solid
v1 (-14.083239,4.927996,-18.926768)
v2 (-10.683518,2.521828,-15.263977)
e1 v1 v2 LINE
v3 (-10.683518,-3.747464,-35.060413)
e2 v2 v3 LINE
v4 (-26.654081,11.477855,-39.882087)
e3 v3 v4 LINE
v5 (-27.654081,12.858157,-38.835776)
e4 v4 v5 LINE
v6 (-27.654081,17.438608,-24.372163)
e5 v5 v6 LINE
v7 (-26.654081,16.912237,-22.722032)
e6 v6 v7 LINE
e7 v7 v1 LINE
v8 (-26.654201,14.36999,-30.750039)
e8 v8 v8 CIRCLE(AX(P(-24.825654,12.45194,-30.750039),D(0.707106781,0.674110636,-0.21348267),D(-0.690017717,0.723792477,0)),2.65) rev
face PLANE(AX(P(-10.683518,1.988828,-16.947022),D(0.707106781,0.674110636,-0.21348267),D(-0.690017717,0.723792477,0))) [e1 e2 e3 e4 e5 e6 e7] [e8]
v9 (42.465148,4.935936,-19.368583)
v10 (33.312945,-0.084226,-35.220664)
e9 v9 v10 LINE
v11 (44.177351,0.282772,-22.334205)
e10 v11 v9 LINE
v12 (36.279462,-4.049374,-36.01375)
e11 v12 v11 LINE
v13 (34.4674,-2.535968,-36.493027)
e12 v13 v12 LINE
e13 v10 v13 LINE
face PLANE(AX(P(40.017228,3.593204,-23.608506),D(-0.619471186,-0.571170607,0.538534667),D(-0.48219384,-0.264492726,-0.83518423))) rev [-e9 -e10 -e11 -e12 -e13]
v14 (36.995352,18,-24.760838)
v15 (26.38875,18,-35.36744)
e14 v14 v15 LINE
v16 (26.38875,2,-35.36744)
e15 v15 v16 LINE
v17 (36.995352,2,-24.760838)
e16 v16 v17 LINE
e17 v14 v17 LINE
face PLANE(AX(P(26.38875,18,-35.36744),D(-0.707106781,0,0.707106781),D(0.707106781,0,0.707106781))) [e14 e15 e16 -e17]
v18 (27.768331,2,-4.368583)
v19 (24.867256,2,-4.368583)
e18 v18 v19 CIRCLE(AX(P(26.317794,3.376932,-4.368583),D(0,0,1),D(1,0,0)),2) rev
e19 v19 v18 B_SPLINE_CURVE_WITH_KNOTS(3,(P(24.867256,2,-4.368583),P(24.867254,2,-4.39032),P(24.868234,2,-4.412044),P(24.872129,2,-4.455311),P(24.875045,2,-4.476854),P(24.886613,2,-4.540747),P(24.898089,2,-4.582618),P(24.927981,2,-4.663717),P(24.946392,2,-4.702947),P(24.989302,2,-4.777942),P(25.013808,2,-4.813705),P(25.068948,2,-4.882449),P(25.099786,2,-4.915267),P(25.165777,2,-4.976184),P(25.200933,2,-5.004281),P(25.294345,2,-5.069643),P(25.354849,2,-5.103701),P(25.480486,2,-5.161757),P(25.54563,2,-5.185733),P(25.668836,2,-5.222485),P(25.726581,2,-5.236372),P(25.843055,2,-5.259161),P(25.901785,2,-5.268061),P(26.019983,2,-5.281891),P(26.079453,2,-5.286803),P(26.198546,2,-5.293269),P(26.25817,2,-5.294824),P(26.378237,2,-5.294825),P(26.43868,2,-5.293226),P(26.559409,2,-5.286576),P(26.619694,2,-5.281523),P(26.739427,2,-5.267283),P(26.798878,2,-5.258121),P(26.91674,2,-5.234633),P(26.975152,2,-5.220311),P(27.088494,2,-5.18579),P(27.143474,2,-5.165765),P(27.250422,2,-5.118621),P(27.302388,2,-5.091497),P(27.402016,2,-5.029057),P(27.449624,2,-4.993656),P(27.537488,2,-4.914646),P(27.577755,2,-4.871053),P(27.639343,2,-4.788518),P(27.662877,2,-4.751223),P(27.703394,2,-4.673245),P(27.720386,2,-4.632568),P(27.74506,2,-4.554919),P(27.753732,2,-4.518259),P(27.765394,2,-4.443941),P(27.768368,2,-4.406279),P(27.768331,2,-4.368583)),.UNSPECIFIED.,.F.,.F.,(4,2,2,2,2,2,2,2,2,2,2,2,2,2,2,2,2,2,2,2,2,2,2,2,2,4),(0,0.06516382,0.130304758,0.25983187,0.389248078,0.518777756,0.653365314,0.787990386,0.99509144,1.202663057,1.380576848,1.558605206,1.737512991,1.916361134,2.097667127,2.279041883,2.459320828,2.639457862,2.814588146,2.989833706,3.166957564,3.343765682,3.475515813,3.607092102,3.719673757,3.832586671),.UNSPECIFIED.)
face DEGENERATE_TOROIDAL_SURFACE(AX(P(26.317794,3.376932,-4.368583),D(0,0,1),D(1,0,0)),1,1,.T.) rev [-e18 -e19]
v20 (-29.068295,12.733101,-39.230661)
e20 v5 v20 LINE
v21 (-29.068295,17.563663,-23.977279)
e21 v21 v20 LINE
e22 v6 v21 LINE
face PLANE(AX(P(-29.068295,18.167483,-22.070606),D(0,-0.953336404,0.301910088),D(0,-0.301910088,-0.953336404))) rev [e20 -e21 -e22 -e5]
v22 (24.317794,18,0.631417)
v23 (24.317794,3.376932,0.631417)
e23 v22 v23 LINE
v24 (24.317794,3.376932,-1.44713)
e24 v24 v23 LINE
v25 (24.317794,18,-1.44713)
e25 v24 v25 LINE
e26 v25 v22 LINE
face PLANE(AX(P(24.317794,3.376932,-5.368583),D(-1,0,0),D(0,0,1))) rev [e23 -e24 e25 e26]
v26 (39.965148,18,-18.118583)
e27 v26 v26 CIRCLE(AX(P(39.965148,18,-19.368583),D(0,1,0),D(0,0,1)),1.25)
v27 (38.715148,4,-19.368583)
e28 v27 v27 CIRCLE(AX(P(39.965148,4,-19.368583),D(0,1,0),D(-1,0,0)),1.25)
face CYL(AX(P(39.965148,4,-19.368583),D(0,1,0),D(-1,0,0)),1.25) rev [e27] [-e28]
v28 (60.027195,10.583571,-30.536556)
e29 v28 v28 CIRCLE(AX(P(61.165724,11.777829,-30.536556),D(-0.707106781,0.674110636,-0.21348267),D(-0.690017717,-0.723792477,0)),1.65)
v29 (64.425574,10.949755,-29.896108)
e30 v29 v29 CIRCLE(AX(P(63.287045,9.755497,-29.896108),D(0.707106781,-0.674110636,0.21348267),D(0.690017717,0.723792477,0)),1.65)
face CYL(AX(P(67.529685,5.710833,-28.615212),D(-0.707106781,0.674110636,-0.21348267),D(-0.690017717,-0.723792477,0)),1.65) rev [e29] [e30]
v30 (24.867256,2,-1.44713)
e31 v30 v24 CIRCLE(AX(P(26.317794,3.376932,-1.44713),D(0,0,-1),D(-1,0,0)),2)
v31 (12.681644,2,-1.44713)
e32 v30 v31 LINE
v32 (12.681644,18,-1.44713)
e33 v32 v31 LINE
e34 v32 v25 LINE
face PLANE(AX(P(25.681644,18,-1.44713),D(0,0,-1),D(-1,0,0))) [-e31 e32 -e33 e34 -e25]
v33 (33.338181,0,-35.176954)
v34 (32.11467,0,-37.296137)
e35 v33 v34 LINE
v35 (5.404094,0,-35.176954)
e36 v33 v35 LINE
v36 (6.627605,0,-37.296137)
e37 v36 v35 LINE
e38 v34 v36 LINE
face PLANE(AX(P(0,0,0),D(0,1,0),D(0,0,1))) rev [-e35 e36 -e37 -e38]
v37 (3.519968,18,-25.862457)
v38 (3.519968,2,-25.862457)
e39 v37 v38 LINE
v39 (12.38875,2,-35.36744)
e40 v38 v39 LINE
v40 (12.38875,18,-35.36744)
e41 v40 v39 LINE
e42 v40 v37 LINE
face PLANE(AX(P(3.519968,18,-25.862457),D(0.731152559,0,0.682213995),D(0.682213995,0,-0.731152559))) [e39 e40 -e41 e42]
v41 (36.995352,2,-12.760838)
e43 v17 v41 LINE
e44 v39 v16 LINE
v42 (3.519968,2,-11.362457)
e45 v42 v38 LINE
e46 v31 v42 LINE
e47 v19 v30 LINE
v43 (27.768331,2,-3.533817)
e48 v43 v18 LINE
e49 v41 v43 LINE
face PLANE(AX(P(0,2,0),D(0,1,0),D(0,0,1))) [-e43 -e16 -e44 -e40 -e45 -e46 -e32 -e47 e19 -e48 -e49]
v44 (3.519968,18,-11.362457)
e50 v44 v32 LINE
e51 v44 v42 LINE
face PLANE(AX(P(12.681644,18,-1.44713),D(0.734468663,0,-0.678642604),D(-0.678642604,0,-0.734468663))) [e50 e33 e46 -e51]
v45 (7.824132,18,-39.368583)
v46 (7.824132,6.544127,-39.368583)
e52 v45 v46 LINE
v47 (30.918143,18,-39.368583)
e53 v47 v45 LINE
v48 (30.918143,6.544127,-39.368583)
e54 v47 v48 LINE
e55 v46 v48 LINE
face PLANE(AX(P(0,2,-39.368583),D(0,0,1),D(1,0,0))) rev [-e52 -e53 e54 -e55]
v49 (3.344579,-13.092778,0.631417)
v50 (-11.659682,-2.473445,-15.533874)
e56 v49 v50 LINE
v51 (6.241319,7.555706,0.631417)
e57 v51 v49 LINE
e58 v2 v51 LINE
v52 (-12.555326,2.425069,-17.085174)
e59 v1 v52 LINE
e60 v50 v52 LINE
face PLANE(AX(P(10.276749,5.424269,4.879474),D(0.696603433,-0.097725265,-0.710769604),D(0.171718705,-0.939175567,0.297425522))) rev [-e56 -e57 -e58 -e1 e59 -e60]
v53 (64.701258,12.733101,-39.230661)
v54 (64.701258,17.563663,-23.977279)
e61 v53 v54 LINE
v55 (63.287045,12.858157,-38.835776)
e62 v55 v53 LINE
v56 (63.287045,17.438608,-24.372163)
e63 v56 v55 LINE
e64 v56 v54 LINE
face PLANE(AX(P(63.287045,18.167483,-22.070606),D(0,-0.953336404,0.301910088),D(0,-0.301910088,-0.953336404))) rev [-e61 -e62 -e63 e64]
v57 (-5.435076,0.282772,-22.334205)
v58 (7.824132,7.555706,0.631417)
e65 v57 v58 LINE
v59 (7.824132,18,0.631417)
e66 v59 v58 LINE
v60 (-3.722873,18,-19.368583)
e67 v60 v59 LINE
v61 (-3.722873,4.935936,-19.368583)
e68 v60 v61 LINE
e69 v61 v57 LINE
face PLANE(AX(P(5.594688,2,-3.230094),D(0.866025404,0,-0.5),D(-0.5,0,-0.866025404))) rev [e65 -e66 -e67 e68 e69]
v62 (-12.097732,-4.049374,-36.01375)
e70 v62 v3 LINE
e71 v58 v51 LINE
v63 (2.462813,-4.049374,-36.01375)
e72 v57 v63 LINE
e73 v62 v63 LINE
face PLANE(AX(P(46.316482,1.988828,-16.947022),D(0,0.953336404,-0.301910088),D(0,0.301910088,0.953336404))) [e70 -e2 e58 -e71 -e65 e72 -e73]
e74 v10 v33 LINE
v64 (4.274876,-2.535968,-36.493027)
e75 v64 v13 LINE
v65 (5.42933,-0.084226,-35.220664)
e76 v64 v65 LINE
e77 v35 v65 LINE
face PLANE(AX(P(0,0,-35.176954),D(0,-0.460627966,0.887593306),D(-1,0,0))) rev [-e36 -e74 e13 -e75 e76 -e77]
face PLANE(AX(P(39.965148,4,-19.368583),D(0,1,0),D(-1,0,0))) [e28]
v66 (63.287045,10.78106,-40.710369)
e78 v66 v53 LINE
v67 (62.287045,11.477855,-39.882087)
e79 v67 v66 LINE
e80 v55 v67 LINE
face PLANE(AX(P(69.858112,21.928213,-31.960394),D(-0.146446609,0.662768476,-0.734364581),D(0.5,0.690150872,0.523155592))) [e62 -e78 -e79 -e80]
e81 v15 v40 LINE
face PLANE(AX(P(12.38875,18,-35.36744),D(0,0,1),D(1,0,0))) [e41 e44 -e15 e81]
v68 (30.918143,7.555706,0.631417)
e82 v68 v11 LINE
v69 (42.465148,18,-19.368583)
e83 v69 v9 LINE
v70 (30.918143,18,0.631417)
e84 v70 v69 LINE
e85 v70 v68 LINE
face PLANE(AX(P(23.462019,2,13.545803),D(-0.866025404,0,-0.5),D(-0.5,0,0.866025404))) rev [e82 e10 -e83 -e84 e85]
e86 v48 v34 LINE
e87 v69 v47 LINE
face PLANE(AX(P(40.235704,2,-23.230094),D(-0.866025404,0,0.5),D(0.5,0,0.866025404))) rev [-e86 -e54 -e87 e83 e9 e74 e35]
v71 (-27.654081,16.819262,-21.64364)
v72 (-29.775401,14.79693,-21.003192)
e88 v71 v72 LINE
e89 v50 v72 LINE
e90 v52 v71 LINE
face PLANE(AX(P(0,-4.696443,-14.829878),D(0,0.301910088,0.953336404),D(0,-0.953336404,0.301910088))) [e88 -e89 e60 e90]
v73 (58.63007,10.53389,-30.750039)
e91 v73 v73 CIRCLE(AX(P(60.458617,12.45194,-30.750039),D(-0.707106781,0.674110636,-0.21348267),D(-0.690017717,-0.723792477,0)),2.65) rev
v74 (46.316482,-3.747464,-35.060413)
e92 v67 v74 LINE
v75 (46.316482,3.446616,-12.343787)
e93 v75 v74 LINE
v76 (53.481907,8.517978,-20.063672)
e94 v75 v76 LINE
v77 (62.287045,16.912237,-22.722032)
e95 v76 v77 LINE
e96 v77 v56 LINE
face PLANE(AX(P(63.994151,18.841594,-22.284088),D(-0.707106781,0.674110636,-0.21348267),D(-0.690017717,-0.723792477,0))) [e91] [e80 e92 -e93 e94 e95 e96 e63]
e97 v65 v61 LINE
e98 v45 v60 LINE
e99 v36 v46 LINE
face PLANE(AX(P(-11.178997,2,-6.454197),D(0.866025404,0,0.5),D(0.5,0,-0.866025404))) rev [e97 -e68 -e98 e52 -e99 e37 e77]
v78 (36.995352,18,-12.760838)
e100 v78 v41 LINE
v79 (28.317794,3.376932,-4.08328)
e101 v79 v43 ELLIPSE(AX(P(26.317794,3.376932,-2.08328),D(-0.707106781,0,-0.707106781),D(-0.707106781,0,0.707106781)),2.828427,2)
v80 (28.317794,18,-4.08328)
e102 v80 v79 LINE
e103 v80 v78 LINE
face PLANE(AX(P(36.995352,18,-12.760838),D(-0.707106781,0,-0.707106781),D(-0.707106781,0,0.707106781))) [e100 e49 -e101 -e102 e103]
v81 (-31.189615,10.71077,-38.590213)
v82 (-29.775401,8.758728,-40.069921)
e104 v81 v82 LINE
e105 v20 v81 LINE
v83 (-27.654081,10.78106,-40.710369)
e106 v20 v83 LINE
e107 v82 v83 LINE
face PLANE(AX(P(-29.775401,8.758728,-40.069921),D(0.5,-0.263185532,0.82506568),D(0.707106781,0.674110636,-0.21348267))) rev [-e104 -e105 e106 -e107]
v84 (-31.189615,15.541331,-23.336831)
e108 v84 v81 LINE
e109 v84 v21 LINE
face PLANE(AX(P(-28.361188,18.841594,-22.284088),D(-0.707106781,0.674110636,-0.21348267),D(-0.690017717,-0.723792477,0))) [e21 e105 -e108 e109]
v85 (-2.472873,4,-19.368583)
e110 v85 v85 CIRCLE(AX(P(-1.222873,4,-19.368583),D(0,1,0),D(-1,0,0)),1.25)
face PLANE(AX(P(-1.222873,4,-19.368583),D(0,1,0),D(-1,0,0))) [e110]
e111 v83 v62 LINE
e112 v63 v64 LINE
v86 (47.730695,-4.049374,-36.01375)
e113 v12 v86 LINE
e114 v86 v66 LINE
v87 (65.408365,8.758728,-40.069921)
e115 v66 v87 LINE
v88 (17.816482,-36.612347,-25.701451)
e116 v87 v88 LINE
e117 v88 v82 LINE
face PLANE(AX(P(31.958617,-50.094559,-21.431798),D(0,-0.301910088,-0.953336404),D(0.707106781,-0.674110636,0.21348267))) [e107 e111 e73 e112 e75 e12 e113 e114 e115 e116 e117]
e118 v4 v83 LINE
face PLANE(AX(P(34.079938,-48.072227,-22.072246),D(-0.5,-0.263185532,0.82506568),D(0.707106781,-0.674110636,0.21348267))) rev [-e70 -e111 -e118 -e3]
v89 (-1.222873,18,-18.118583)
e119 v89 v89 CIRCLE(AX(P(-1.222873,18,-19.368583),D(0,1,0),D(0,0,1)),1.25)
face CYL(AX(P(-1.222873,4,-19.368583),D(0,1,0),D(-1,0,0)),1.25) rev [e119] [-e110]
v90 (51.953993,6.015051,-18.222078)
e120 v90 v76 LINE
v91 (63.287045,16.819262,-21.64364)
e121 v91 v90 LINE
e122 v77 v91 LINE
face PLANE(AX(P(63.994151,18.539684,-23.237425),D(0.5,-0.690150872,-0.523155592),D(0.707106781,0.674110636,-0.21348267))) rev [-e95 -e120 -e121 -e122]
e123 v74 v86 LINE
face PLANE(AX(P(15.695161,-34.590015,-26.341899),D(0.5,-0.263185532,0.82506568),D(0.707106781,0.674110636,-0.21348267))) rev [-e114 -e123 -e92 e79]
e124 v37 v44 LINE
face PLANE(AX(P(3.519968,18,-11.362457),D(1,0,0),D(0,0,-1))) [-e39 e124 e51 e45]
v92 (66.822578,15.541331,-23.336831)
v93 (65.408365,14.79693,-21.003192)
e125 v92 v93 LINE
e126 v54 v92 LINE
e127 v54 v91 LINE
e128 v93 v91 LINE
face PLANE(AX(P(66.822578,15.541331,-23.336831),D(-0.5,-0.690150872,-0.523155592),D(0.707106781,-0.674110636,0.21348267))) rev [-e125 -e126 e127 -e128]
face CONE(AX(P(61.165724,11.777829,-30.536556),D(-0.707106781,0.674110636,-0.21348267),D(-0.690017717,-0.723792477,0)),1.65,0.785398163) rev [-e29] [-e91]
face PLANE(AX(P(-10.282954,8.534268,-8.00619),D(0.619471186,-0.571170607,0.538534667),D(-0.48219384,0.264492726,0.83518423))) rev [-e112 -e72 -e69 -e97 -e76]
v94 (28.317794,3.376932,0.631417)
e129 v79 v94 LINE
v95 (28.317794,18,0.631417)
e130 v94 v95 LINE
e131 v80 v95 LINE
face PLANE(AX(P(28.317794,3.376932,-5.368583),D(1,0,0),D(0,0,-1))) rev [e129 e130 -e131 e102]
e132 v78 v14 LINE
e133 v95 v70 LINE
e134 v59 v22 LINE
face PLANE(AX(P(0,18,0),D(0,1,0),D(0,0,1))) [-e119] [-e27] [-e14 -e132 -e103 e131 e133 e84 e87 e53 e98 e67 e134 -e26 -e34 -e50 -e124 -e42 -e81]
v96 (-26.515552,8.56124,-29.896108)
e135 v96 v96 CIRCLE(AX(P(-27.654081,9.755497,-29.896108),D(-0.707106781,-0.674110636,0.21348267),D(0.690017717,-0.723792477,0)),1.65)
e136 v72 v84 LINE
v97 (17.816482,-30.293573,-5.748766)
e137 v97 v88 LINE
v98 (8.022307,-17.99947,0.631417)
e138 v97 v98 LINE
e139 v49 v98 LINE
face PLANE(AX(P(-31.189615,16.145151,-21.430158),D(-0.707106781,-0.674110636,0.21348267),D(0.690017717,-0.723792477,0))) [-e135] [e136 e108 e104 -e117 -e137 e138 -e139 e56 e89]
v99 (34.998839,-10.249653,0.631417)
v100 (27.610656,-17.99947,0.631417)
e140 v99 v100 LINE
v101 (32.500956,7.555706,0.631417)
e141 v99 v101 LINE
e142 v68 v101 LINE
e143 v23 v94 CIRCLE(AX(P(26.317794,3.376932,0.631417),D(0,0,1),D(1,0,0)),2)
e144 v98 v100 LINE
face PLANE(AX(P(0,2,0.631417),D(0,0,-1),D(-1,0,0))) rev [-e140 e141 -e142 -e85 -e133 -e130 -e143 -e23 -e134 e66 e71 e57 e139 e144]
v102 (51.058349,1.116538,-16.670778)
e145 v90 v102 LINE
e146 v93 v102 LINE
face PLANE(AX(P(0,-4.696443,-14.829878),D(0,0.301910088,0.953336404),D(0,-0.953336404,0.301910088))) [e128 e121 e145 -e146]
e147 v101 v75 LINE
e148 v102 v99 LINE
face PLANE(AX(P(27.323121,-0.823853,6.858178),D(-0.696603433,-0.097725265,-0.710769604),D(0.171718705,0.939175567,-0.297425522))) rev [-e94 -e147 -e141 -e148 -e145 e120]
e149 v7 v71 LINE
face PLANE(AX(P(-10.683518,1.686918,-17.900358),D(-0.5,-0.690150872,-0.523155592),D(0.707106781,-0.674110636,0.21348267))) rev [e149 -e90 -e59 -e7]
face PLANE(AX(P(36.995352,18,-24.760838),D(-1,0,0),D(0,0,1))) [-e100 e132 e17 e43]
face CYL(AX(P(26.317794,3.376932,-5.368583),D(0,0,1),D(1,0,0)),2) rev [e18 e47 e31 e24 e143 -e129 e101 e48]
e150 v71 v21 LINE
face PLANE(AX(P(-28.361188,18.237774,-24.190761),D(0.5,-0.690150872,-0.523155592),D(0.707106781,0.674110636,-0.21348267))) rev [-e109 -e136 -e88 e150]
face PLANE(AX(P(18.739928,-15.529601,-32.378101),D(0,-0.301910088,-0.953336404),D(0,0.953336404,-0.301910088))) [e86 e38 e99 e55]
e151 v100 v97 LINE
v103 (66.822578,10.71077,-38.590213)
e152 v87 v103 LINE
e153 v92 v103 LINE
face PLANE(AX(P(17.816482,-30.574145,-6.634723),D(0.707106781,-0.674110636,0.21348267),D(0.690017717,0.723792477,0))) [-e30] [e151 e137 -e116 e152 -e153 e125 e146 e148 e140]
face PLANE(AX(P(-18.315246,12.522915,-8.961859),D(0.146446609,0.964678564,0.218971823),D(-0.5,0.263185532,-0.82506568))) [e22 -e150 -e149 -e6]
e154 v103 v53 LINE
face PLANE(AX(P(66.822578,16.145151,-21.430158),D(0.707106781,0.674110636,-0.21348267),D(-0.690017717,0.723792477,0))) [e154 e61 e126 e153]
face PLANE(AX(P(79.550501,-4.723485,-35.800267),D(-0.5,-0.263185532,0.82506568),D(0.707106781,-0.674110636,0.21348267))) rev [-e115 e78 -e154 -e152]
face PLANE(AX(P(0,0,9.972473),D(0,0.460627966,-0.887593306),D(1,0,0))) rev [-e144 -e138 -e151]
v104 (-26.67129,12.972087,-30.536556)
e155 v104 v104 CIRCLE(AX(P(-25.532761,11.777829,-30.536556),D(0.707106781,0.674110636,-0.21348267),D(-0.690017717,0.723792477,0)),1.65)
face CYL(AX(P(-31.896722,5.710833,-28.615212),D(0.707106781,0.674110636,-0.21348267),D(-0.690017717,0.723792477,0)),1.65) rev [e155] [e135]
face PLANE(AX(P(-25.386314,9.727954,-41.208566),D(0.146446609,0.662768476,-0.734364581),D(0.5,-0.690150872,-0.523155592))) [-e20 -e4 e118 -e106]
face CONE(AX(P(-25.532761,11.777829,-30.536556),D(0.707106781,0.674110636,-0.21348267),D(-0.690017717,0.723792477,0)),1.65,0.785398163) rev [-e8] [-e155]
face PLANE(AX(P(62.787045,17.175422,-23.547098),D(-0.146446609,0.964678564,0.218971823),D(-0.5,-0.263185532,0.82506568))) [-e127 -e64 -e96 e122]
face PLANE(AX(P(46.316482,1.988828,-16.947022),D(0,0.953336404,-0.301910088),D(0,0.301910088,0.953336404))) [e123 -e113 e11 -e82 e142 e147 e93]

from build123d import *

# Parameters (mm, degrees)
BOSS_EXTRUDE3_DEPTH   = 1.9999999999999931
BOSS_EXTRUDE4_DEPTH   = 18.000000000000004
CUT_EXTRUDE2_DEPTH    = 5.9999999999999964
FILLET2_R             = 1
BOSS_EXTRUDE5_DEPTH   = 13.9
BOSS_EXTRUDE6_DEPTH   = 6.1
SKETCH9_R             = 76.29483757465395
CUT_EXTRUDE3_DEPTH    = 12.00000000000001
CHAMFER5_SIZE         = 15
CHAMFER5_SIZE_2       = 11.949844195
CHAMFER6_SIZE         = 26.289657229
CHAMFER6_SIZE_2       = 33
CHAMFER7_SIZE         = 10
CHAMFER7_SIZE_2       = 24.849963072
CHAMFER8_SIZE         = 3
CHAMFER8_SIZE2        = 3.581723532320745
CHAMFER8_EDGE_2_SIZE  = 3
CHAMFER8_EDGE_2_SIZE2 = 3.581723532320745
SKETCH10_R            = 1.250000000000001
SKETCH10_R_2          = 1.2500000000000047
CUT_EXTRUDE4_DEPTH    = 15
SKETCH11_R            = 1.6500000000000021
CUT_EXTRUDE5_DEPTH    = 10
SKETCH12_R            = 1.6500000000000021
CUT_EXTRUDE6_DEPTH    = 10
CHAMFER9_SIZE         = 2
CHAMFER10_SIZE        = 1
CHAMFER11_SIZE        = 1


with BuildPart() as part:
    # Sketch4 → Boss-Extrude3 (new body)
    # profile 1 of 2: a face of its own
    with BuildSketch(Plane(origin=(0, 0, 0), x_dir=(1, 0, 0), z_dir=(0, 1, 0))):
        Polygon((7.824132301685717, -0.6314167523101926), (30.918143069270773, -0.631416752310193), (42.46514845306328, 19.368583247689788), (30.918143069270762, 39.3685832476898), (7.824132301685726, 39.3685832476898), (-3.7228730821067892, 19.368583247689806), align=None)
        Polygon((3.519968483082529, 11.362456608232566), (3.519968483082529, 25.862456608232566), (12.388750416506909, 35.367439881093425), (26.38875041650691, 35.367439881093425), (36.99535213430513, 24.760838163295233), (36.99535213430513, 12.760838163295231), (25.681643635320377, 1.447129664310468), (12.681643635320377, 1.4471296643104665), align=None, mode=Mode.SUBTRACT)
    # profile 2 of 2: a face of its own
    with BuildSketch(Plane(origin=(0, 0, 0), x_dir=(1, 0, 0), z_dir=(0, 1, 0))):
        Polygon((3.519968483082529, 25.862456608232566), (12.388750416506909, 35.367439881093425), (26.38875041650691, 35.367439881093425), (36.99535213430513, 24.760838163295233), (36.99535213430513, 12.760838163295231), (25.681643635320377, 1.447129664310468), (12.681643635320377, 1.4471296643104665), (3.519968483082529, 11.362456608232566), align=None)
    extrude(amount=BOSS_EXTRUDE3_DEPTH)

    # Sketch4<3> → Boss-Extrude4 (add)
    with BuildSketch(Plane(origin=(0, 0, 0), x_dir=(1, 0, 0), z_dir=(0, 1, 0))):
        Polygon((42.46514845306328, 19.368583247689788), (30.918143069270762, 39.3685832476898), (7.824132301685726, 39.3685832476898), (-3.7228730821067892, 19.368583247689806), (7.824132301685717, -0.6314167523101926), (30.918143069270773, -0.631416752310193), align=None)
        Polygon((12.388750416506909, 35.367439881093425), (26.38875041650691, 35.367439881093425), (36.99535213430513, 24.760838163295233), (36.99535213430513, 12.760838163295231), (25.681643635320377, 1.447129664310468), (12.681643635320377, 1.4471296643104665), (3.519968483082529, 11.362456608232566), (3.519968483082529, 25.862456608232566), align=None, mode=Mode.SUBTRACT)
    extrude(amount=BOSS_EXTRUDE4_DEPTH)

    # Sketch6 → Cut-Extrude2 (cut)
    with BuildSketch(Plane.XY.offset(0.6314167523101925)):
        with BuildLine():
            Line((24.31779352067575, 3.376931571822402), (24.31779352067575, 18.000000000000004))
            ThreePointArc((24.31779352067575, 18.000000000000004), (26.317793520675753, 20), (28.31779352067575, 18.000000000000004))
            Line((28.31779352067575, 18.000000000000004), (28.31779352067575, 3.376931571822402))
            ThreePointArc((28.31779352067575, 3.376931571822402), (26.317793520675753, 1.3769315718223982), (24.31779352067575, 3.376931571822402))
        make_face()
    extrude(amount=-CUT_EXTRUDE2_DEPTH, mode=Mode.SUBTRACT)

    # Fillet2
    # the kernel refuses this fillet: 1 mm, written as the material it adds along each edge
    with BuildSketch(Plane(origin=(26.31779352067575, 3.3769315718223982, -5.368583247689804), x_dir=(0.8817842513635834, 0.4716529805345926, 0), z_dir=(-0.4716529805345926, 0.8817842513635834, 0))) as fillet2_piece_1_section:
        with BuildLine():
            CenterArc((2.000000000000001 - FILLET2_R, -FILLET2_R), FILLET2_R, 0, 90)
            Line((2.000000000000001 - FILLET2_R, 0), (2.000000000000001, 0))
            Line((2.000000000000001, 0), (2.000000000000001, -FILLET2_R))
        make_face()
    fillet2_piece_1 = revolve(axis=Axis((26.31779352067575, 3.3769315718223982, -5.368583247689804), (0, 0, -1)), revolution_arc=236.283297356719, mode=Mode.PRIVATE)
    fillet2_piece_1 = split(fillet2_piece_1, bisect_by=Plane(origin=(26.31779352067575, 1.9999999999999931, -5.368583247689804), z_dir=(0, -1, 0)), keep=Keep.TOP, mode=Mode.PRIVATE)
    add(fillet2_piece_1)

    # Sketch7 → Boss-Extrude5 (add)
    with BuildSketch(Plane(origin=(-2.3433e-13, -8.892992763494398, -28.081253619485487), x_dir=(-1, 2.4e-15, 7.58e-15), z_dir=(-7.955288143323601e-15, -0.30191008762919974, -0.9533364038930481))):
        Polygon((-17.816481796236683, -27.144355489981812), (-66.82257845064771, 21.861741164426753), (-63.9941513259015, 24.69016828917295), (-46.3164817962378, 7.012498759509267), (10.683518203762196, 7.01249875950926), (28.361187733425872, 24.690168289172963), (31.189614858172064, 21.861741164426775), align=None)
    extrude(amount=-BOSS_EXTRUDE5_DEPTH)

    # Sketch7<2> → Boss-Extrude6 (add)
    with BuildSketch(Plane(origin=(-2.3433e-13, -8.892992763494398, -28.081253619485487), x_dir=(-1, 2.4e-15, 7.58e-15), z_dir=(-7.955288143323601e-15, -0.30191008762919974, -0.9533364038930481))):
        Polygon((-17.816481796236683, -27.144355489981812), (-66.82257845064771, 21.861741164426753), (-63.9941513259015, 24.69016828917295), (-46.3164817962378, 7.012498759509267), (10.683518203762196, 7.01249875950926), (28.361187733425872, 24.690168289172963), (31.189614858172064, 21.861741164426775), align=None)
    extrude(amount=BOSS_EXTRUDE6_DEPTH)

    # Sketch9 → Cut-Extrude3 (cut)
    with BuildSketch(Plane(origin=(-2.4437e-13, -10.73464429803257, -33.896605683233126), x_dir=(-1, 2.08e-15, 6.55e-15), z_dir=(-6.8729633786059295e-15, -0.30191008762920085, -0.9533364038930477))):
        with Locations((-18.739928273786745, -5.029658831402463)):
            Circle(SKETCH9_R)
    extrude(amount=CUT_EXTRUDE3_DEPTH, mode=Mode.SUBTRACT)

    # Chamfer5
    # the kernel refuses this chamfer: 15, 11.949844195 mm, written as the material it adds along each edge
    with BuildSketch(Plane(origin=(-40.07039654949479, -6.7e-16, -23.227109814634193), x_dir=(0, -0.3019100876291997, -0.9533364038930482), z_dir=(1, 0, -4.1e-16))) as chamfer5_piece_1_section:
        Polygon((CHAMFER5_SIZE, -1.7e-16), (CHAMFER5_SIZE_2 * 0.953336403892, CHAMFER5_SIZE_2 * 0.301910087629), (0, 0), align=None)
    chamfer5_piece_1 = extrude(amount=118.88306846994604, mode=Mode.PRIVATE)
    chamfer5_piece_1 = split(chamfer5_piece_1, bisect_by=Plane(origin=(-11.138962934878297, -6.7e-16, -6.523538829193566), z_dir=(0.8660254037844386, 0, 0.5000000000000002)), keep=Keep.TOP, mode=Mode.PRIVATE)
    chamfer5_piece_1 = split(chamfer5_piece_1, bisect_by=Plane(origin=(20.160471188348254, -6.7e-16, -58.0014175166026), z_dir=(-0.8660254037844387, 0, 0.49999999999999983)), keep=Keep.TOP, mode=Mode.PRIVATE)
    chamfer5_piece_1 = split(chamfer5_piece_1, bisect_by=Plane(origin=(-40.070396549494895, -4.049373948337407, -36.01374979821588), z_dir=(7.955288143323603e-15, 0.3019100876291998, 0.9533364038930482)), keep=Keep.TOP, mode=Mode.PRIVATE)
    add(chamfer5_piece_1)

    # Chamfer6
    # the kernel refuses this chamfer: 33, 26.289657229 mm, written as the material it adds along each edge
    with BuildSketch(Plane(origin=(-86.82668553862769, 6e-17, -16.317184053181116), x_dir=(8.34e-15, 0, 1), z_dir=(1, 0, -8.34e-15))) as chamfer6_piece_1_section:
        Polygon((CHAMFER6_SIZE, 0), (CHAMFER6_SIZE_2 * 0.301910087629, CHAMFER6_SIZE_2 * 0.953336403893), (0, 0), align=None)
    chamfer6_piece_1 = extrude(amount=212.3956464482121, mode=Mode.PRIVATE)
    chamfer6_piece_1 = split(chamfer6_piece_1, bisect_by=Plane(origin=(8.820895345374609, 6e-17, 38.90497251753413), z_dir=(-0.8660254037844387, 0, -0.5000000000000001)), keep=Keep.TOP, mode=Mode.PRIVATE)
    chamfer6_piece_1 = split(chamfer6_piece_1, bisect_by=Plane(origin=(-86.82668553862769, 6e-17, 0.6314167523101908), z_dir=(2e-17, 0, -1)), keep=Keep.TOP, mode=Mode.PRIVATE)
    chamfer6_piece_1 = split(chamfer6_piece_1, bisect_by=Plane(origin=(-23.17753158647104, 6e-17, -53.06504022115066), z_dir=(0.8660254037844388, 0, -0.49999999999999967)), keep=Keep.TOP, mode=Mode.PRIVATE)
    chamfer6_piece_1 = split(chamfer6_piece_1, bisect_by=Plane(origin=(-18.469762892528394, -65.16714281663096, 4.320460452965666), z_dir=(-0.70710678118653, 0.6741106359447901, -0.213482670271232)), keep=Keep.TOP, mode=Mode.PRIVATE)
    chamfer6_piece_1 = split(chamfer6_piece_1, bisect_by=Plane(origin=(-50.54044084986548, 34.5929980223678, -27.27236736690021), z_dir=(0.7071067811865465, 0.6741106359447712, -0.21348267027123768)), keep=Keep.TOP, mode=Mode.PRIVATE)
    add(chamfer6_piece_1)

    # Chamfer7
    # the kernel refuses this chamfer: 24.849963072, 10 mm, written as the material it adds along each edge
    with BuildSketch(Plane(origin=(-13.402538260860302, 62.57603192906444, -36.134255137466226), x_dir=(-0.985146022817089, -0.16370569293011733, 0.051843609345241695), z_dir=(0.17171870523525357, -0.9391755667020143, 0.29742552207616374))) as chamfer7_piece_1_section:
        Polygon((CHAMFER7_SIZE, 0), (-CHAMFER7_SIZE_2 * 0.47666820195, -CHAMFER7_SIZE_2 * 0.879083286874), (0, 0), align=None)
    chamfer7_piece_1 = extrude(amount=146.25239464157488, mode=Mode.PRIVATE)
    chamfer7_piece_1 = split(chamfer7_piece_1, bisect_by=Plane(origin=(-13.402538260860302, 62.57603192906444, 0.6314167523100025), z_dir=(0, 0, -1)), keep=Keep.TOP, mode=Mode.PRIVATE)
    chamfer7_piece_1 = split(chamfer7_piece_1, bisect_by=Plane(origin=(-13.402538260860295, 1.9888278042485794, -16.94702172034867), z_dir=(0, -0.9533364038930481, 0.3019100876291998)), keep=Keep.TOP, mode=Mode.PRIVATE)
    chamfer7_piece_1 = split(chamfer7_piece_1, bisect_by=Plane(origin=(-46.64785866937016, 30.88205772455304, -26.09715753968952), z_dir=(0.7071067811866999, 0.674110635944714, -0.21348267027090945)), keep=Keep.TOP, mode=Mode.PRIVATE)
    add(chamfer7_piece_1)
    with BuildSketch(Plane(origin=(-13.402538260860302, 62.57603192906444, -36.134255137466226), x_dir=(-0.985146022817089, -0.16370569293011733, 0.051843609345241695), z_dir=(0.17171870523525357, -0.9391755667020143, 0.29742552207616374))) as chamfer7_piece_2_section:
        Polygon((CHAMFER7_SIZE, 0), (-CHAMFER7_SIZE_2 * 0.47666820195, -CHAMFER7_SIZE_2 * 0.879083286874), (0, 0), align=None)
    chamfer7_piece_2 = extrude(amount=146.25239464157488, mode=Mode.PRIVATE)
    chamfer7_piece_2 = split(chamfer7_piece_2, bisect_by=Plane(origin=(-43.819431544616265, 33.57850026833004, -26.951088220759228), z_dir=(-0.7071067811865481, -0.6741106359447696, 0.2134826702712372)), keep=Keep.TOP, mode=Mode.PRIVATE)
    chamfer7_piece_2 = split(chamfer7_piece_2, bisect_by=Plane(origin=(1.116959507238203, 62.57603192906444, -27.751419192552138), z_dir=(-0.866025403784329, 0, -0.50000000000019)), keep=Keep.TOP, mode=Mode.PRIVATE)
    chamfer7_piece_2 = split(chamfer7_piece_2, bisect_by=Plane(origin=(-46.64785866937016, 30.88205772455304, -26.09715753968952), z_dir=(0.7071067811866999, 0.674110635944714, -0.21348267027090945)), keep=Keep.TOP, mode=Mode.PRIVATE)
    add(chamfer7_piece_2)
    with BuildSketch(Plane(origin=(40.70342230672514, 1.421e-14, -16.317184053181006), x_dir=(-0.46958778335124995, 0.34343741046908505, 0.8133498993775979), z_dir=(-0.17171870523460778, -0.9391755667021419, 0.29742552207613376))) as chamfer7_piece_3_section:
        Polygon((CHAMFER7_SIZE_2, 5e-17), (-CHAMFER7_SIZE * 0.476668201947, -CHAMFER7_SIZE * 0.879083286869), (0, 0), align=None)
    chamfer7_piece_3 = extrude(amount=75.8012281617361, mode=Mode.PRIVATE)
    chamfer7_piece_3 = split(chamfer7_piece_3, bisect_by=Plane(origin=(40.70342230672514, 1.421e-14, 0.6314167523099989), z_dir=(0, 0, -1)), keep=Keep.TOP, mode=Mode.PRIVATE)
    chamfer7_piece_3 = split(chamfer7_piece_3, bisect_by=Plane(origin=(45.29529103013723, -4.37759561592531, -14.930852564516274), z_dir=(-0.7071067811866999, 0.674110635944714, -0.21348267027090945)), keep=Keep.TOP, mode=Mode.PRIVATE)
    add(chamfer7_piece_3)
    with BuildSketch(Plane(origin=(40.703422306709314, 0, -16.317184053182185), x_dir=(-0.4695877833507219, 0.3434374104692333, 0.8133498993778403), z_dir=(0.17171870523461666, 0.9391755667020876, -0.29742552207629974))) as chamfer7_piece_4_section:
        Polygon((CHAMFER7_SIZE_2, -1.39e-15), (-CHAMFER7_SIZE * 0.476668201946, CHAMFER7_SIZE * 0.87908328687), (0, 0), align=None)
    chamfer7_piece_4 = extrude(amount=66.6286838666467, mode=Mode.PRIVATE)
    chamfer7_piece_4 = split(chamfer7_piece_4, bisect_by=Plane(origin=(40.703422306709314, 0, 0.6314167523099989), z_dir=(0, 0, -1)), keep=Keep.TOP, mode=Mode.PRIVATE)
    chamfer7_piece_4 = split(chamfer7_piece_4, bisect_by=Plane(origin=(40.703422306709314, 1.9888278042464063, -16.94702172035553), z_dir=(0, -0.9533364038930481, 0.3019100876291998)), keep=Keep.TOP, mode=Mode.PRIVATE)
    chamfer7_piece_4 = split(chamfer7_piece_4, bisect_by=Plane(origin=(45.29529103012948, -4.377595615933028, -14.930852564515012), z_dir=(-0.7071067811866999, 0.674110635944714, -0.21348267027090945)), keep=Keep.TOP, mode=Mode.PRIVATE)
    add(chamfer7_piece_4)
    with BuildSketch(Plane(origin=(40.703422306709314, 0, -16.317184053182185), x_dir=(-0.4695877833507219, 0.3434374104692333, 0.8133498993778403), z_dir=(0.17171870523461666, 0.9391755667020876, -0.29742552207629974))) as chamfer7_piece_5_section:
        Polygon((CHAMFER7_SIZE_2, -1.39e-15), (-CHAMFER7_SIZE * 0.476668201946, CHAMFER7_SIZE * 0.87908328687), (0, 0), align=None)
    chamfer7_piece_5 = extrude(amount=66.6286838666467, mode=Mode.PRIVATE)
    chamfer7_piece_5 = split(chamfer7_piece_5, bisect_by=Plane(origin=(42.46686390539787, -1.6811530721691632, -15.78478324559316), z_dir=(0.7071067811865476, -0.6741106359447736, 0.21348267027122672)), keep=Keep.TOP, mode=Mode.PRIVATE)
    chamfer7_piece_5 = split(chamfer7_piece_5, bisect_by=Plane(origin=(45.29529103012948, -4.377595615933028, -14.930852564515012), z_dir=(-0.7071067811866999, 0.674110635944714, -0.21348267027090945)), keep=Keep.TOP, mode=Mode.PRIVATE)
    add(chamfer7_piece_5)

    # Chamfer8
    chamfer8_edges = [part.edges().sort_by_distance(p)[0] for p in [
        (37.66010275874009, -1.413712668985988, -27.691166522953175),
    ]]
    chamfer8_side = [part.faces().sort_by_distance(p)[0] for p in [
        (39.11811662501184, 5.412102651204146, -6.137404334709689),
    ]]
    chamfer(chamfer8_edges, length=CHAMFER8_SIZE, length2=CHAMFER8_SIZE2, reference=chamfer8_side[0])

    # Chamfer8 edge 2
    chamfer8_edge_2_edges = [part.edges().sort_by_distance(p)[0] for p in [
        (1.082172612223939, -1.413712668985995, -27.691166522953186),
    ]]
    chamfer8_edge_2_side = [part.faces().sort_by_distance(p)[0] for p in [
        (-3.753441987426493, 0.3224095092149044, -22.209042732119624),
    ]]
    chamfer(chamfer8_edge_2_edges, length=CHAMFER8_EDGE_2_SIZE, length2=CHAMFER8_EDGE_2_SIZE2, reference=chamfer8_edge_2_side[0])

    # Sketch10 → Cut-Extrude4 (cut)
    with BuildSketch(Plane(origin=(0, 19.000000000000004, 0), x_dir=(1, 0, 0), z_dir=(0, 1, 0))):
        with Locations(Location((-1.222873082106972, 19.36858324769008, 0), (0, 0, 180))):
            Circle(SKETCH10_R)
        with Locations(Location((39.96514845306313, 19.36858324769008, 0), (0, 0, 180))):
            Circle(SKETCH10_R_2)
    extrude(amount=-CUT_EXTRUDE4_DEPTH, mode=Mode.SUBTRACT)

    # Sketch11 → Cut-Extrude5 (cut)
    with BuildSketch(Plane(origin=(35.32201665467818, -41.86992335687557, -3.057486659815476), x_dir=(0.7071067811865472, -0.6741106359447733, 0.21348267027122825), z_dir=(0.7071067811865479, 0.6741106359447697, -0.21348267027123718))):
        with Locations(Location((-85.06165134103477, 9.999999999999932, 0), (0, 0, 192.622135028))):
            Circle(SKETCH11_R)
    extrude(amount=-CUT_EXTRUDE5_DEPTH, mode=Mode.SUBTRACT)

    # Sketch12 → Cut-Extrude6 (cut)
    with BuildSketch(Plane(origin=(0.6719496880472284, -41.525766293156714, -3.166477031777557), x_dir=(0.7071067811865476, 0.6741106359447698, -0.21348267027123732), z_dir=(-0.7071067811865476, 0.6741106359447735, -0.21348267027122664))):
        with Locations(Location((84.55111635557729, 10.000000000000021, 0), (0, 0, 167.377864972))):
            Circle(SKETCH12_R)
    extrude(amount=-CUT_EXTRUDE6_DEPTH, mode=Mode.SUBTRACT)

    # Chamfer9
    chamfer9_edges = [part.edges().sort_by_distance(p)[0] for p in [
        (65.40836488827448, 17.49337243097609, -21.857123136594044),
        (-29.775401295799092, 17.493372430976333, -21.857123136593327),
        (-29.775401295799252, 11.455170678392335, -40.923851214454295),
        (65.40836488827432, 11.455170678392093, -40.92385121445501),
    ]]
    chamfer(chamfer9_edges, length=CHAMFER9_SIZE)

    # Chamfer10
    chamfer10_edges = [part.edges().sort_by_distance(p)[0] for p in [
        (54.448209779882745, 3.702898365027181, -38.46880050633574),
        (57.416239101908474, 12.57063051812014, -20.298150421173567),
        (-23.687124594014378, 11.257682059679667, -30.7500391646968),
        (63.9941513259013, 15.822492826574202, -31.817452516065217),
        (63.28704454471424, 12.431191401966615, -40.18399748083003),
        (63.28704454471484, 17.86557297929168, -23.023942210758307),
        (-18.815246187407773, 3.70289836502743, -38.46880050633521),
        (-28.361187733426075, 15.82249282657436, -31.817452516064762),
        (-19.900423737640644, 10.775639380936056, -19.729698477758326),
        (-27.65408095223878, 12.431191401967412, -40.18399748083),
        (-27.654080952242666, 17.865572979288856, -23.02394221075666),
    ]]
    chamfer(chamfer10_edges, length=CHAMFER10_SIZE)

    # Chamfer11
    chamfer11_edges = [part.edges().sort_by_distance(p)[0] for p in [
        (61.59714665344764, 13.646197234020015, -30.7500391647242),
    ]]
    chamfer(chamfer11_edges, length=CHAMFER11_SIZE)


solid = part.part
